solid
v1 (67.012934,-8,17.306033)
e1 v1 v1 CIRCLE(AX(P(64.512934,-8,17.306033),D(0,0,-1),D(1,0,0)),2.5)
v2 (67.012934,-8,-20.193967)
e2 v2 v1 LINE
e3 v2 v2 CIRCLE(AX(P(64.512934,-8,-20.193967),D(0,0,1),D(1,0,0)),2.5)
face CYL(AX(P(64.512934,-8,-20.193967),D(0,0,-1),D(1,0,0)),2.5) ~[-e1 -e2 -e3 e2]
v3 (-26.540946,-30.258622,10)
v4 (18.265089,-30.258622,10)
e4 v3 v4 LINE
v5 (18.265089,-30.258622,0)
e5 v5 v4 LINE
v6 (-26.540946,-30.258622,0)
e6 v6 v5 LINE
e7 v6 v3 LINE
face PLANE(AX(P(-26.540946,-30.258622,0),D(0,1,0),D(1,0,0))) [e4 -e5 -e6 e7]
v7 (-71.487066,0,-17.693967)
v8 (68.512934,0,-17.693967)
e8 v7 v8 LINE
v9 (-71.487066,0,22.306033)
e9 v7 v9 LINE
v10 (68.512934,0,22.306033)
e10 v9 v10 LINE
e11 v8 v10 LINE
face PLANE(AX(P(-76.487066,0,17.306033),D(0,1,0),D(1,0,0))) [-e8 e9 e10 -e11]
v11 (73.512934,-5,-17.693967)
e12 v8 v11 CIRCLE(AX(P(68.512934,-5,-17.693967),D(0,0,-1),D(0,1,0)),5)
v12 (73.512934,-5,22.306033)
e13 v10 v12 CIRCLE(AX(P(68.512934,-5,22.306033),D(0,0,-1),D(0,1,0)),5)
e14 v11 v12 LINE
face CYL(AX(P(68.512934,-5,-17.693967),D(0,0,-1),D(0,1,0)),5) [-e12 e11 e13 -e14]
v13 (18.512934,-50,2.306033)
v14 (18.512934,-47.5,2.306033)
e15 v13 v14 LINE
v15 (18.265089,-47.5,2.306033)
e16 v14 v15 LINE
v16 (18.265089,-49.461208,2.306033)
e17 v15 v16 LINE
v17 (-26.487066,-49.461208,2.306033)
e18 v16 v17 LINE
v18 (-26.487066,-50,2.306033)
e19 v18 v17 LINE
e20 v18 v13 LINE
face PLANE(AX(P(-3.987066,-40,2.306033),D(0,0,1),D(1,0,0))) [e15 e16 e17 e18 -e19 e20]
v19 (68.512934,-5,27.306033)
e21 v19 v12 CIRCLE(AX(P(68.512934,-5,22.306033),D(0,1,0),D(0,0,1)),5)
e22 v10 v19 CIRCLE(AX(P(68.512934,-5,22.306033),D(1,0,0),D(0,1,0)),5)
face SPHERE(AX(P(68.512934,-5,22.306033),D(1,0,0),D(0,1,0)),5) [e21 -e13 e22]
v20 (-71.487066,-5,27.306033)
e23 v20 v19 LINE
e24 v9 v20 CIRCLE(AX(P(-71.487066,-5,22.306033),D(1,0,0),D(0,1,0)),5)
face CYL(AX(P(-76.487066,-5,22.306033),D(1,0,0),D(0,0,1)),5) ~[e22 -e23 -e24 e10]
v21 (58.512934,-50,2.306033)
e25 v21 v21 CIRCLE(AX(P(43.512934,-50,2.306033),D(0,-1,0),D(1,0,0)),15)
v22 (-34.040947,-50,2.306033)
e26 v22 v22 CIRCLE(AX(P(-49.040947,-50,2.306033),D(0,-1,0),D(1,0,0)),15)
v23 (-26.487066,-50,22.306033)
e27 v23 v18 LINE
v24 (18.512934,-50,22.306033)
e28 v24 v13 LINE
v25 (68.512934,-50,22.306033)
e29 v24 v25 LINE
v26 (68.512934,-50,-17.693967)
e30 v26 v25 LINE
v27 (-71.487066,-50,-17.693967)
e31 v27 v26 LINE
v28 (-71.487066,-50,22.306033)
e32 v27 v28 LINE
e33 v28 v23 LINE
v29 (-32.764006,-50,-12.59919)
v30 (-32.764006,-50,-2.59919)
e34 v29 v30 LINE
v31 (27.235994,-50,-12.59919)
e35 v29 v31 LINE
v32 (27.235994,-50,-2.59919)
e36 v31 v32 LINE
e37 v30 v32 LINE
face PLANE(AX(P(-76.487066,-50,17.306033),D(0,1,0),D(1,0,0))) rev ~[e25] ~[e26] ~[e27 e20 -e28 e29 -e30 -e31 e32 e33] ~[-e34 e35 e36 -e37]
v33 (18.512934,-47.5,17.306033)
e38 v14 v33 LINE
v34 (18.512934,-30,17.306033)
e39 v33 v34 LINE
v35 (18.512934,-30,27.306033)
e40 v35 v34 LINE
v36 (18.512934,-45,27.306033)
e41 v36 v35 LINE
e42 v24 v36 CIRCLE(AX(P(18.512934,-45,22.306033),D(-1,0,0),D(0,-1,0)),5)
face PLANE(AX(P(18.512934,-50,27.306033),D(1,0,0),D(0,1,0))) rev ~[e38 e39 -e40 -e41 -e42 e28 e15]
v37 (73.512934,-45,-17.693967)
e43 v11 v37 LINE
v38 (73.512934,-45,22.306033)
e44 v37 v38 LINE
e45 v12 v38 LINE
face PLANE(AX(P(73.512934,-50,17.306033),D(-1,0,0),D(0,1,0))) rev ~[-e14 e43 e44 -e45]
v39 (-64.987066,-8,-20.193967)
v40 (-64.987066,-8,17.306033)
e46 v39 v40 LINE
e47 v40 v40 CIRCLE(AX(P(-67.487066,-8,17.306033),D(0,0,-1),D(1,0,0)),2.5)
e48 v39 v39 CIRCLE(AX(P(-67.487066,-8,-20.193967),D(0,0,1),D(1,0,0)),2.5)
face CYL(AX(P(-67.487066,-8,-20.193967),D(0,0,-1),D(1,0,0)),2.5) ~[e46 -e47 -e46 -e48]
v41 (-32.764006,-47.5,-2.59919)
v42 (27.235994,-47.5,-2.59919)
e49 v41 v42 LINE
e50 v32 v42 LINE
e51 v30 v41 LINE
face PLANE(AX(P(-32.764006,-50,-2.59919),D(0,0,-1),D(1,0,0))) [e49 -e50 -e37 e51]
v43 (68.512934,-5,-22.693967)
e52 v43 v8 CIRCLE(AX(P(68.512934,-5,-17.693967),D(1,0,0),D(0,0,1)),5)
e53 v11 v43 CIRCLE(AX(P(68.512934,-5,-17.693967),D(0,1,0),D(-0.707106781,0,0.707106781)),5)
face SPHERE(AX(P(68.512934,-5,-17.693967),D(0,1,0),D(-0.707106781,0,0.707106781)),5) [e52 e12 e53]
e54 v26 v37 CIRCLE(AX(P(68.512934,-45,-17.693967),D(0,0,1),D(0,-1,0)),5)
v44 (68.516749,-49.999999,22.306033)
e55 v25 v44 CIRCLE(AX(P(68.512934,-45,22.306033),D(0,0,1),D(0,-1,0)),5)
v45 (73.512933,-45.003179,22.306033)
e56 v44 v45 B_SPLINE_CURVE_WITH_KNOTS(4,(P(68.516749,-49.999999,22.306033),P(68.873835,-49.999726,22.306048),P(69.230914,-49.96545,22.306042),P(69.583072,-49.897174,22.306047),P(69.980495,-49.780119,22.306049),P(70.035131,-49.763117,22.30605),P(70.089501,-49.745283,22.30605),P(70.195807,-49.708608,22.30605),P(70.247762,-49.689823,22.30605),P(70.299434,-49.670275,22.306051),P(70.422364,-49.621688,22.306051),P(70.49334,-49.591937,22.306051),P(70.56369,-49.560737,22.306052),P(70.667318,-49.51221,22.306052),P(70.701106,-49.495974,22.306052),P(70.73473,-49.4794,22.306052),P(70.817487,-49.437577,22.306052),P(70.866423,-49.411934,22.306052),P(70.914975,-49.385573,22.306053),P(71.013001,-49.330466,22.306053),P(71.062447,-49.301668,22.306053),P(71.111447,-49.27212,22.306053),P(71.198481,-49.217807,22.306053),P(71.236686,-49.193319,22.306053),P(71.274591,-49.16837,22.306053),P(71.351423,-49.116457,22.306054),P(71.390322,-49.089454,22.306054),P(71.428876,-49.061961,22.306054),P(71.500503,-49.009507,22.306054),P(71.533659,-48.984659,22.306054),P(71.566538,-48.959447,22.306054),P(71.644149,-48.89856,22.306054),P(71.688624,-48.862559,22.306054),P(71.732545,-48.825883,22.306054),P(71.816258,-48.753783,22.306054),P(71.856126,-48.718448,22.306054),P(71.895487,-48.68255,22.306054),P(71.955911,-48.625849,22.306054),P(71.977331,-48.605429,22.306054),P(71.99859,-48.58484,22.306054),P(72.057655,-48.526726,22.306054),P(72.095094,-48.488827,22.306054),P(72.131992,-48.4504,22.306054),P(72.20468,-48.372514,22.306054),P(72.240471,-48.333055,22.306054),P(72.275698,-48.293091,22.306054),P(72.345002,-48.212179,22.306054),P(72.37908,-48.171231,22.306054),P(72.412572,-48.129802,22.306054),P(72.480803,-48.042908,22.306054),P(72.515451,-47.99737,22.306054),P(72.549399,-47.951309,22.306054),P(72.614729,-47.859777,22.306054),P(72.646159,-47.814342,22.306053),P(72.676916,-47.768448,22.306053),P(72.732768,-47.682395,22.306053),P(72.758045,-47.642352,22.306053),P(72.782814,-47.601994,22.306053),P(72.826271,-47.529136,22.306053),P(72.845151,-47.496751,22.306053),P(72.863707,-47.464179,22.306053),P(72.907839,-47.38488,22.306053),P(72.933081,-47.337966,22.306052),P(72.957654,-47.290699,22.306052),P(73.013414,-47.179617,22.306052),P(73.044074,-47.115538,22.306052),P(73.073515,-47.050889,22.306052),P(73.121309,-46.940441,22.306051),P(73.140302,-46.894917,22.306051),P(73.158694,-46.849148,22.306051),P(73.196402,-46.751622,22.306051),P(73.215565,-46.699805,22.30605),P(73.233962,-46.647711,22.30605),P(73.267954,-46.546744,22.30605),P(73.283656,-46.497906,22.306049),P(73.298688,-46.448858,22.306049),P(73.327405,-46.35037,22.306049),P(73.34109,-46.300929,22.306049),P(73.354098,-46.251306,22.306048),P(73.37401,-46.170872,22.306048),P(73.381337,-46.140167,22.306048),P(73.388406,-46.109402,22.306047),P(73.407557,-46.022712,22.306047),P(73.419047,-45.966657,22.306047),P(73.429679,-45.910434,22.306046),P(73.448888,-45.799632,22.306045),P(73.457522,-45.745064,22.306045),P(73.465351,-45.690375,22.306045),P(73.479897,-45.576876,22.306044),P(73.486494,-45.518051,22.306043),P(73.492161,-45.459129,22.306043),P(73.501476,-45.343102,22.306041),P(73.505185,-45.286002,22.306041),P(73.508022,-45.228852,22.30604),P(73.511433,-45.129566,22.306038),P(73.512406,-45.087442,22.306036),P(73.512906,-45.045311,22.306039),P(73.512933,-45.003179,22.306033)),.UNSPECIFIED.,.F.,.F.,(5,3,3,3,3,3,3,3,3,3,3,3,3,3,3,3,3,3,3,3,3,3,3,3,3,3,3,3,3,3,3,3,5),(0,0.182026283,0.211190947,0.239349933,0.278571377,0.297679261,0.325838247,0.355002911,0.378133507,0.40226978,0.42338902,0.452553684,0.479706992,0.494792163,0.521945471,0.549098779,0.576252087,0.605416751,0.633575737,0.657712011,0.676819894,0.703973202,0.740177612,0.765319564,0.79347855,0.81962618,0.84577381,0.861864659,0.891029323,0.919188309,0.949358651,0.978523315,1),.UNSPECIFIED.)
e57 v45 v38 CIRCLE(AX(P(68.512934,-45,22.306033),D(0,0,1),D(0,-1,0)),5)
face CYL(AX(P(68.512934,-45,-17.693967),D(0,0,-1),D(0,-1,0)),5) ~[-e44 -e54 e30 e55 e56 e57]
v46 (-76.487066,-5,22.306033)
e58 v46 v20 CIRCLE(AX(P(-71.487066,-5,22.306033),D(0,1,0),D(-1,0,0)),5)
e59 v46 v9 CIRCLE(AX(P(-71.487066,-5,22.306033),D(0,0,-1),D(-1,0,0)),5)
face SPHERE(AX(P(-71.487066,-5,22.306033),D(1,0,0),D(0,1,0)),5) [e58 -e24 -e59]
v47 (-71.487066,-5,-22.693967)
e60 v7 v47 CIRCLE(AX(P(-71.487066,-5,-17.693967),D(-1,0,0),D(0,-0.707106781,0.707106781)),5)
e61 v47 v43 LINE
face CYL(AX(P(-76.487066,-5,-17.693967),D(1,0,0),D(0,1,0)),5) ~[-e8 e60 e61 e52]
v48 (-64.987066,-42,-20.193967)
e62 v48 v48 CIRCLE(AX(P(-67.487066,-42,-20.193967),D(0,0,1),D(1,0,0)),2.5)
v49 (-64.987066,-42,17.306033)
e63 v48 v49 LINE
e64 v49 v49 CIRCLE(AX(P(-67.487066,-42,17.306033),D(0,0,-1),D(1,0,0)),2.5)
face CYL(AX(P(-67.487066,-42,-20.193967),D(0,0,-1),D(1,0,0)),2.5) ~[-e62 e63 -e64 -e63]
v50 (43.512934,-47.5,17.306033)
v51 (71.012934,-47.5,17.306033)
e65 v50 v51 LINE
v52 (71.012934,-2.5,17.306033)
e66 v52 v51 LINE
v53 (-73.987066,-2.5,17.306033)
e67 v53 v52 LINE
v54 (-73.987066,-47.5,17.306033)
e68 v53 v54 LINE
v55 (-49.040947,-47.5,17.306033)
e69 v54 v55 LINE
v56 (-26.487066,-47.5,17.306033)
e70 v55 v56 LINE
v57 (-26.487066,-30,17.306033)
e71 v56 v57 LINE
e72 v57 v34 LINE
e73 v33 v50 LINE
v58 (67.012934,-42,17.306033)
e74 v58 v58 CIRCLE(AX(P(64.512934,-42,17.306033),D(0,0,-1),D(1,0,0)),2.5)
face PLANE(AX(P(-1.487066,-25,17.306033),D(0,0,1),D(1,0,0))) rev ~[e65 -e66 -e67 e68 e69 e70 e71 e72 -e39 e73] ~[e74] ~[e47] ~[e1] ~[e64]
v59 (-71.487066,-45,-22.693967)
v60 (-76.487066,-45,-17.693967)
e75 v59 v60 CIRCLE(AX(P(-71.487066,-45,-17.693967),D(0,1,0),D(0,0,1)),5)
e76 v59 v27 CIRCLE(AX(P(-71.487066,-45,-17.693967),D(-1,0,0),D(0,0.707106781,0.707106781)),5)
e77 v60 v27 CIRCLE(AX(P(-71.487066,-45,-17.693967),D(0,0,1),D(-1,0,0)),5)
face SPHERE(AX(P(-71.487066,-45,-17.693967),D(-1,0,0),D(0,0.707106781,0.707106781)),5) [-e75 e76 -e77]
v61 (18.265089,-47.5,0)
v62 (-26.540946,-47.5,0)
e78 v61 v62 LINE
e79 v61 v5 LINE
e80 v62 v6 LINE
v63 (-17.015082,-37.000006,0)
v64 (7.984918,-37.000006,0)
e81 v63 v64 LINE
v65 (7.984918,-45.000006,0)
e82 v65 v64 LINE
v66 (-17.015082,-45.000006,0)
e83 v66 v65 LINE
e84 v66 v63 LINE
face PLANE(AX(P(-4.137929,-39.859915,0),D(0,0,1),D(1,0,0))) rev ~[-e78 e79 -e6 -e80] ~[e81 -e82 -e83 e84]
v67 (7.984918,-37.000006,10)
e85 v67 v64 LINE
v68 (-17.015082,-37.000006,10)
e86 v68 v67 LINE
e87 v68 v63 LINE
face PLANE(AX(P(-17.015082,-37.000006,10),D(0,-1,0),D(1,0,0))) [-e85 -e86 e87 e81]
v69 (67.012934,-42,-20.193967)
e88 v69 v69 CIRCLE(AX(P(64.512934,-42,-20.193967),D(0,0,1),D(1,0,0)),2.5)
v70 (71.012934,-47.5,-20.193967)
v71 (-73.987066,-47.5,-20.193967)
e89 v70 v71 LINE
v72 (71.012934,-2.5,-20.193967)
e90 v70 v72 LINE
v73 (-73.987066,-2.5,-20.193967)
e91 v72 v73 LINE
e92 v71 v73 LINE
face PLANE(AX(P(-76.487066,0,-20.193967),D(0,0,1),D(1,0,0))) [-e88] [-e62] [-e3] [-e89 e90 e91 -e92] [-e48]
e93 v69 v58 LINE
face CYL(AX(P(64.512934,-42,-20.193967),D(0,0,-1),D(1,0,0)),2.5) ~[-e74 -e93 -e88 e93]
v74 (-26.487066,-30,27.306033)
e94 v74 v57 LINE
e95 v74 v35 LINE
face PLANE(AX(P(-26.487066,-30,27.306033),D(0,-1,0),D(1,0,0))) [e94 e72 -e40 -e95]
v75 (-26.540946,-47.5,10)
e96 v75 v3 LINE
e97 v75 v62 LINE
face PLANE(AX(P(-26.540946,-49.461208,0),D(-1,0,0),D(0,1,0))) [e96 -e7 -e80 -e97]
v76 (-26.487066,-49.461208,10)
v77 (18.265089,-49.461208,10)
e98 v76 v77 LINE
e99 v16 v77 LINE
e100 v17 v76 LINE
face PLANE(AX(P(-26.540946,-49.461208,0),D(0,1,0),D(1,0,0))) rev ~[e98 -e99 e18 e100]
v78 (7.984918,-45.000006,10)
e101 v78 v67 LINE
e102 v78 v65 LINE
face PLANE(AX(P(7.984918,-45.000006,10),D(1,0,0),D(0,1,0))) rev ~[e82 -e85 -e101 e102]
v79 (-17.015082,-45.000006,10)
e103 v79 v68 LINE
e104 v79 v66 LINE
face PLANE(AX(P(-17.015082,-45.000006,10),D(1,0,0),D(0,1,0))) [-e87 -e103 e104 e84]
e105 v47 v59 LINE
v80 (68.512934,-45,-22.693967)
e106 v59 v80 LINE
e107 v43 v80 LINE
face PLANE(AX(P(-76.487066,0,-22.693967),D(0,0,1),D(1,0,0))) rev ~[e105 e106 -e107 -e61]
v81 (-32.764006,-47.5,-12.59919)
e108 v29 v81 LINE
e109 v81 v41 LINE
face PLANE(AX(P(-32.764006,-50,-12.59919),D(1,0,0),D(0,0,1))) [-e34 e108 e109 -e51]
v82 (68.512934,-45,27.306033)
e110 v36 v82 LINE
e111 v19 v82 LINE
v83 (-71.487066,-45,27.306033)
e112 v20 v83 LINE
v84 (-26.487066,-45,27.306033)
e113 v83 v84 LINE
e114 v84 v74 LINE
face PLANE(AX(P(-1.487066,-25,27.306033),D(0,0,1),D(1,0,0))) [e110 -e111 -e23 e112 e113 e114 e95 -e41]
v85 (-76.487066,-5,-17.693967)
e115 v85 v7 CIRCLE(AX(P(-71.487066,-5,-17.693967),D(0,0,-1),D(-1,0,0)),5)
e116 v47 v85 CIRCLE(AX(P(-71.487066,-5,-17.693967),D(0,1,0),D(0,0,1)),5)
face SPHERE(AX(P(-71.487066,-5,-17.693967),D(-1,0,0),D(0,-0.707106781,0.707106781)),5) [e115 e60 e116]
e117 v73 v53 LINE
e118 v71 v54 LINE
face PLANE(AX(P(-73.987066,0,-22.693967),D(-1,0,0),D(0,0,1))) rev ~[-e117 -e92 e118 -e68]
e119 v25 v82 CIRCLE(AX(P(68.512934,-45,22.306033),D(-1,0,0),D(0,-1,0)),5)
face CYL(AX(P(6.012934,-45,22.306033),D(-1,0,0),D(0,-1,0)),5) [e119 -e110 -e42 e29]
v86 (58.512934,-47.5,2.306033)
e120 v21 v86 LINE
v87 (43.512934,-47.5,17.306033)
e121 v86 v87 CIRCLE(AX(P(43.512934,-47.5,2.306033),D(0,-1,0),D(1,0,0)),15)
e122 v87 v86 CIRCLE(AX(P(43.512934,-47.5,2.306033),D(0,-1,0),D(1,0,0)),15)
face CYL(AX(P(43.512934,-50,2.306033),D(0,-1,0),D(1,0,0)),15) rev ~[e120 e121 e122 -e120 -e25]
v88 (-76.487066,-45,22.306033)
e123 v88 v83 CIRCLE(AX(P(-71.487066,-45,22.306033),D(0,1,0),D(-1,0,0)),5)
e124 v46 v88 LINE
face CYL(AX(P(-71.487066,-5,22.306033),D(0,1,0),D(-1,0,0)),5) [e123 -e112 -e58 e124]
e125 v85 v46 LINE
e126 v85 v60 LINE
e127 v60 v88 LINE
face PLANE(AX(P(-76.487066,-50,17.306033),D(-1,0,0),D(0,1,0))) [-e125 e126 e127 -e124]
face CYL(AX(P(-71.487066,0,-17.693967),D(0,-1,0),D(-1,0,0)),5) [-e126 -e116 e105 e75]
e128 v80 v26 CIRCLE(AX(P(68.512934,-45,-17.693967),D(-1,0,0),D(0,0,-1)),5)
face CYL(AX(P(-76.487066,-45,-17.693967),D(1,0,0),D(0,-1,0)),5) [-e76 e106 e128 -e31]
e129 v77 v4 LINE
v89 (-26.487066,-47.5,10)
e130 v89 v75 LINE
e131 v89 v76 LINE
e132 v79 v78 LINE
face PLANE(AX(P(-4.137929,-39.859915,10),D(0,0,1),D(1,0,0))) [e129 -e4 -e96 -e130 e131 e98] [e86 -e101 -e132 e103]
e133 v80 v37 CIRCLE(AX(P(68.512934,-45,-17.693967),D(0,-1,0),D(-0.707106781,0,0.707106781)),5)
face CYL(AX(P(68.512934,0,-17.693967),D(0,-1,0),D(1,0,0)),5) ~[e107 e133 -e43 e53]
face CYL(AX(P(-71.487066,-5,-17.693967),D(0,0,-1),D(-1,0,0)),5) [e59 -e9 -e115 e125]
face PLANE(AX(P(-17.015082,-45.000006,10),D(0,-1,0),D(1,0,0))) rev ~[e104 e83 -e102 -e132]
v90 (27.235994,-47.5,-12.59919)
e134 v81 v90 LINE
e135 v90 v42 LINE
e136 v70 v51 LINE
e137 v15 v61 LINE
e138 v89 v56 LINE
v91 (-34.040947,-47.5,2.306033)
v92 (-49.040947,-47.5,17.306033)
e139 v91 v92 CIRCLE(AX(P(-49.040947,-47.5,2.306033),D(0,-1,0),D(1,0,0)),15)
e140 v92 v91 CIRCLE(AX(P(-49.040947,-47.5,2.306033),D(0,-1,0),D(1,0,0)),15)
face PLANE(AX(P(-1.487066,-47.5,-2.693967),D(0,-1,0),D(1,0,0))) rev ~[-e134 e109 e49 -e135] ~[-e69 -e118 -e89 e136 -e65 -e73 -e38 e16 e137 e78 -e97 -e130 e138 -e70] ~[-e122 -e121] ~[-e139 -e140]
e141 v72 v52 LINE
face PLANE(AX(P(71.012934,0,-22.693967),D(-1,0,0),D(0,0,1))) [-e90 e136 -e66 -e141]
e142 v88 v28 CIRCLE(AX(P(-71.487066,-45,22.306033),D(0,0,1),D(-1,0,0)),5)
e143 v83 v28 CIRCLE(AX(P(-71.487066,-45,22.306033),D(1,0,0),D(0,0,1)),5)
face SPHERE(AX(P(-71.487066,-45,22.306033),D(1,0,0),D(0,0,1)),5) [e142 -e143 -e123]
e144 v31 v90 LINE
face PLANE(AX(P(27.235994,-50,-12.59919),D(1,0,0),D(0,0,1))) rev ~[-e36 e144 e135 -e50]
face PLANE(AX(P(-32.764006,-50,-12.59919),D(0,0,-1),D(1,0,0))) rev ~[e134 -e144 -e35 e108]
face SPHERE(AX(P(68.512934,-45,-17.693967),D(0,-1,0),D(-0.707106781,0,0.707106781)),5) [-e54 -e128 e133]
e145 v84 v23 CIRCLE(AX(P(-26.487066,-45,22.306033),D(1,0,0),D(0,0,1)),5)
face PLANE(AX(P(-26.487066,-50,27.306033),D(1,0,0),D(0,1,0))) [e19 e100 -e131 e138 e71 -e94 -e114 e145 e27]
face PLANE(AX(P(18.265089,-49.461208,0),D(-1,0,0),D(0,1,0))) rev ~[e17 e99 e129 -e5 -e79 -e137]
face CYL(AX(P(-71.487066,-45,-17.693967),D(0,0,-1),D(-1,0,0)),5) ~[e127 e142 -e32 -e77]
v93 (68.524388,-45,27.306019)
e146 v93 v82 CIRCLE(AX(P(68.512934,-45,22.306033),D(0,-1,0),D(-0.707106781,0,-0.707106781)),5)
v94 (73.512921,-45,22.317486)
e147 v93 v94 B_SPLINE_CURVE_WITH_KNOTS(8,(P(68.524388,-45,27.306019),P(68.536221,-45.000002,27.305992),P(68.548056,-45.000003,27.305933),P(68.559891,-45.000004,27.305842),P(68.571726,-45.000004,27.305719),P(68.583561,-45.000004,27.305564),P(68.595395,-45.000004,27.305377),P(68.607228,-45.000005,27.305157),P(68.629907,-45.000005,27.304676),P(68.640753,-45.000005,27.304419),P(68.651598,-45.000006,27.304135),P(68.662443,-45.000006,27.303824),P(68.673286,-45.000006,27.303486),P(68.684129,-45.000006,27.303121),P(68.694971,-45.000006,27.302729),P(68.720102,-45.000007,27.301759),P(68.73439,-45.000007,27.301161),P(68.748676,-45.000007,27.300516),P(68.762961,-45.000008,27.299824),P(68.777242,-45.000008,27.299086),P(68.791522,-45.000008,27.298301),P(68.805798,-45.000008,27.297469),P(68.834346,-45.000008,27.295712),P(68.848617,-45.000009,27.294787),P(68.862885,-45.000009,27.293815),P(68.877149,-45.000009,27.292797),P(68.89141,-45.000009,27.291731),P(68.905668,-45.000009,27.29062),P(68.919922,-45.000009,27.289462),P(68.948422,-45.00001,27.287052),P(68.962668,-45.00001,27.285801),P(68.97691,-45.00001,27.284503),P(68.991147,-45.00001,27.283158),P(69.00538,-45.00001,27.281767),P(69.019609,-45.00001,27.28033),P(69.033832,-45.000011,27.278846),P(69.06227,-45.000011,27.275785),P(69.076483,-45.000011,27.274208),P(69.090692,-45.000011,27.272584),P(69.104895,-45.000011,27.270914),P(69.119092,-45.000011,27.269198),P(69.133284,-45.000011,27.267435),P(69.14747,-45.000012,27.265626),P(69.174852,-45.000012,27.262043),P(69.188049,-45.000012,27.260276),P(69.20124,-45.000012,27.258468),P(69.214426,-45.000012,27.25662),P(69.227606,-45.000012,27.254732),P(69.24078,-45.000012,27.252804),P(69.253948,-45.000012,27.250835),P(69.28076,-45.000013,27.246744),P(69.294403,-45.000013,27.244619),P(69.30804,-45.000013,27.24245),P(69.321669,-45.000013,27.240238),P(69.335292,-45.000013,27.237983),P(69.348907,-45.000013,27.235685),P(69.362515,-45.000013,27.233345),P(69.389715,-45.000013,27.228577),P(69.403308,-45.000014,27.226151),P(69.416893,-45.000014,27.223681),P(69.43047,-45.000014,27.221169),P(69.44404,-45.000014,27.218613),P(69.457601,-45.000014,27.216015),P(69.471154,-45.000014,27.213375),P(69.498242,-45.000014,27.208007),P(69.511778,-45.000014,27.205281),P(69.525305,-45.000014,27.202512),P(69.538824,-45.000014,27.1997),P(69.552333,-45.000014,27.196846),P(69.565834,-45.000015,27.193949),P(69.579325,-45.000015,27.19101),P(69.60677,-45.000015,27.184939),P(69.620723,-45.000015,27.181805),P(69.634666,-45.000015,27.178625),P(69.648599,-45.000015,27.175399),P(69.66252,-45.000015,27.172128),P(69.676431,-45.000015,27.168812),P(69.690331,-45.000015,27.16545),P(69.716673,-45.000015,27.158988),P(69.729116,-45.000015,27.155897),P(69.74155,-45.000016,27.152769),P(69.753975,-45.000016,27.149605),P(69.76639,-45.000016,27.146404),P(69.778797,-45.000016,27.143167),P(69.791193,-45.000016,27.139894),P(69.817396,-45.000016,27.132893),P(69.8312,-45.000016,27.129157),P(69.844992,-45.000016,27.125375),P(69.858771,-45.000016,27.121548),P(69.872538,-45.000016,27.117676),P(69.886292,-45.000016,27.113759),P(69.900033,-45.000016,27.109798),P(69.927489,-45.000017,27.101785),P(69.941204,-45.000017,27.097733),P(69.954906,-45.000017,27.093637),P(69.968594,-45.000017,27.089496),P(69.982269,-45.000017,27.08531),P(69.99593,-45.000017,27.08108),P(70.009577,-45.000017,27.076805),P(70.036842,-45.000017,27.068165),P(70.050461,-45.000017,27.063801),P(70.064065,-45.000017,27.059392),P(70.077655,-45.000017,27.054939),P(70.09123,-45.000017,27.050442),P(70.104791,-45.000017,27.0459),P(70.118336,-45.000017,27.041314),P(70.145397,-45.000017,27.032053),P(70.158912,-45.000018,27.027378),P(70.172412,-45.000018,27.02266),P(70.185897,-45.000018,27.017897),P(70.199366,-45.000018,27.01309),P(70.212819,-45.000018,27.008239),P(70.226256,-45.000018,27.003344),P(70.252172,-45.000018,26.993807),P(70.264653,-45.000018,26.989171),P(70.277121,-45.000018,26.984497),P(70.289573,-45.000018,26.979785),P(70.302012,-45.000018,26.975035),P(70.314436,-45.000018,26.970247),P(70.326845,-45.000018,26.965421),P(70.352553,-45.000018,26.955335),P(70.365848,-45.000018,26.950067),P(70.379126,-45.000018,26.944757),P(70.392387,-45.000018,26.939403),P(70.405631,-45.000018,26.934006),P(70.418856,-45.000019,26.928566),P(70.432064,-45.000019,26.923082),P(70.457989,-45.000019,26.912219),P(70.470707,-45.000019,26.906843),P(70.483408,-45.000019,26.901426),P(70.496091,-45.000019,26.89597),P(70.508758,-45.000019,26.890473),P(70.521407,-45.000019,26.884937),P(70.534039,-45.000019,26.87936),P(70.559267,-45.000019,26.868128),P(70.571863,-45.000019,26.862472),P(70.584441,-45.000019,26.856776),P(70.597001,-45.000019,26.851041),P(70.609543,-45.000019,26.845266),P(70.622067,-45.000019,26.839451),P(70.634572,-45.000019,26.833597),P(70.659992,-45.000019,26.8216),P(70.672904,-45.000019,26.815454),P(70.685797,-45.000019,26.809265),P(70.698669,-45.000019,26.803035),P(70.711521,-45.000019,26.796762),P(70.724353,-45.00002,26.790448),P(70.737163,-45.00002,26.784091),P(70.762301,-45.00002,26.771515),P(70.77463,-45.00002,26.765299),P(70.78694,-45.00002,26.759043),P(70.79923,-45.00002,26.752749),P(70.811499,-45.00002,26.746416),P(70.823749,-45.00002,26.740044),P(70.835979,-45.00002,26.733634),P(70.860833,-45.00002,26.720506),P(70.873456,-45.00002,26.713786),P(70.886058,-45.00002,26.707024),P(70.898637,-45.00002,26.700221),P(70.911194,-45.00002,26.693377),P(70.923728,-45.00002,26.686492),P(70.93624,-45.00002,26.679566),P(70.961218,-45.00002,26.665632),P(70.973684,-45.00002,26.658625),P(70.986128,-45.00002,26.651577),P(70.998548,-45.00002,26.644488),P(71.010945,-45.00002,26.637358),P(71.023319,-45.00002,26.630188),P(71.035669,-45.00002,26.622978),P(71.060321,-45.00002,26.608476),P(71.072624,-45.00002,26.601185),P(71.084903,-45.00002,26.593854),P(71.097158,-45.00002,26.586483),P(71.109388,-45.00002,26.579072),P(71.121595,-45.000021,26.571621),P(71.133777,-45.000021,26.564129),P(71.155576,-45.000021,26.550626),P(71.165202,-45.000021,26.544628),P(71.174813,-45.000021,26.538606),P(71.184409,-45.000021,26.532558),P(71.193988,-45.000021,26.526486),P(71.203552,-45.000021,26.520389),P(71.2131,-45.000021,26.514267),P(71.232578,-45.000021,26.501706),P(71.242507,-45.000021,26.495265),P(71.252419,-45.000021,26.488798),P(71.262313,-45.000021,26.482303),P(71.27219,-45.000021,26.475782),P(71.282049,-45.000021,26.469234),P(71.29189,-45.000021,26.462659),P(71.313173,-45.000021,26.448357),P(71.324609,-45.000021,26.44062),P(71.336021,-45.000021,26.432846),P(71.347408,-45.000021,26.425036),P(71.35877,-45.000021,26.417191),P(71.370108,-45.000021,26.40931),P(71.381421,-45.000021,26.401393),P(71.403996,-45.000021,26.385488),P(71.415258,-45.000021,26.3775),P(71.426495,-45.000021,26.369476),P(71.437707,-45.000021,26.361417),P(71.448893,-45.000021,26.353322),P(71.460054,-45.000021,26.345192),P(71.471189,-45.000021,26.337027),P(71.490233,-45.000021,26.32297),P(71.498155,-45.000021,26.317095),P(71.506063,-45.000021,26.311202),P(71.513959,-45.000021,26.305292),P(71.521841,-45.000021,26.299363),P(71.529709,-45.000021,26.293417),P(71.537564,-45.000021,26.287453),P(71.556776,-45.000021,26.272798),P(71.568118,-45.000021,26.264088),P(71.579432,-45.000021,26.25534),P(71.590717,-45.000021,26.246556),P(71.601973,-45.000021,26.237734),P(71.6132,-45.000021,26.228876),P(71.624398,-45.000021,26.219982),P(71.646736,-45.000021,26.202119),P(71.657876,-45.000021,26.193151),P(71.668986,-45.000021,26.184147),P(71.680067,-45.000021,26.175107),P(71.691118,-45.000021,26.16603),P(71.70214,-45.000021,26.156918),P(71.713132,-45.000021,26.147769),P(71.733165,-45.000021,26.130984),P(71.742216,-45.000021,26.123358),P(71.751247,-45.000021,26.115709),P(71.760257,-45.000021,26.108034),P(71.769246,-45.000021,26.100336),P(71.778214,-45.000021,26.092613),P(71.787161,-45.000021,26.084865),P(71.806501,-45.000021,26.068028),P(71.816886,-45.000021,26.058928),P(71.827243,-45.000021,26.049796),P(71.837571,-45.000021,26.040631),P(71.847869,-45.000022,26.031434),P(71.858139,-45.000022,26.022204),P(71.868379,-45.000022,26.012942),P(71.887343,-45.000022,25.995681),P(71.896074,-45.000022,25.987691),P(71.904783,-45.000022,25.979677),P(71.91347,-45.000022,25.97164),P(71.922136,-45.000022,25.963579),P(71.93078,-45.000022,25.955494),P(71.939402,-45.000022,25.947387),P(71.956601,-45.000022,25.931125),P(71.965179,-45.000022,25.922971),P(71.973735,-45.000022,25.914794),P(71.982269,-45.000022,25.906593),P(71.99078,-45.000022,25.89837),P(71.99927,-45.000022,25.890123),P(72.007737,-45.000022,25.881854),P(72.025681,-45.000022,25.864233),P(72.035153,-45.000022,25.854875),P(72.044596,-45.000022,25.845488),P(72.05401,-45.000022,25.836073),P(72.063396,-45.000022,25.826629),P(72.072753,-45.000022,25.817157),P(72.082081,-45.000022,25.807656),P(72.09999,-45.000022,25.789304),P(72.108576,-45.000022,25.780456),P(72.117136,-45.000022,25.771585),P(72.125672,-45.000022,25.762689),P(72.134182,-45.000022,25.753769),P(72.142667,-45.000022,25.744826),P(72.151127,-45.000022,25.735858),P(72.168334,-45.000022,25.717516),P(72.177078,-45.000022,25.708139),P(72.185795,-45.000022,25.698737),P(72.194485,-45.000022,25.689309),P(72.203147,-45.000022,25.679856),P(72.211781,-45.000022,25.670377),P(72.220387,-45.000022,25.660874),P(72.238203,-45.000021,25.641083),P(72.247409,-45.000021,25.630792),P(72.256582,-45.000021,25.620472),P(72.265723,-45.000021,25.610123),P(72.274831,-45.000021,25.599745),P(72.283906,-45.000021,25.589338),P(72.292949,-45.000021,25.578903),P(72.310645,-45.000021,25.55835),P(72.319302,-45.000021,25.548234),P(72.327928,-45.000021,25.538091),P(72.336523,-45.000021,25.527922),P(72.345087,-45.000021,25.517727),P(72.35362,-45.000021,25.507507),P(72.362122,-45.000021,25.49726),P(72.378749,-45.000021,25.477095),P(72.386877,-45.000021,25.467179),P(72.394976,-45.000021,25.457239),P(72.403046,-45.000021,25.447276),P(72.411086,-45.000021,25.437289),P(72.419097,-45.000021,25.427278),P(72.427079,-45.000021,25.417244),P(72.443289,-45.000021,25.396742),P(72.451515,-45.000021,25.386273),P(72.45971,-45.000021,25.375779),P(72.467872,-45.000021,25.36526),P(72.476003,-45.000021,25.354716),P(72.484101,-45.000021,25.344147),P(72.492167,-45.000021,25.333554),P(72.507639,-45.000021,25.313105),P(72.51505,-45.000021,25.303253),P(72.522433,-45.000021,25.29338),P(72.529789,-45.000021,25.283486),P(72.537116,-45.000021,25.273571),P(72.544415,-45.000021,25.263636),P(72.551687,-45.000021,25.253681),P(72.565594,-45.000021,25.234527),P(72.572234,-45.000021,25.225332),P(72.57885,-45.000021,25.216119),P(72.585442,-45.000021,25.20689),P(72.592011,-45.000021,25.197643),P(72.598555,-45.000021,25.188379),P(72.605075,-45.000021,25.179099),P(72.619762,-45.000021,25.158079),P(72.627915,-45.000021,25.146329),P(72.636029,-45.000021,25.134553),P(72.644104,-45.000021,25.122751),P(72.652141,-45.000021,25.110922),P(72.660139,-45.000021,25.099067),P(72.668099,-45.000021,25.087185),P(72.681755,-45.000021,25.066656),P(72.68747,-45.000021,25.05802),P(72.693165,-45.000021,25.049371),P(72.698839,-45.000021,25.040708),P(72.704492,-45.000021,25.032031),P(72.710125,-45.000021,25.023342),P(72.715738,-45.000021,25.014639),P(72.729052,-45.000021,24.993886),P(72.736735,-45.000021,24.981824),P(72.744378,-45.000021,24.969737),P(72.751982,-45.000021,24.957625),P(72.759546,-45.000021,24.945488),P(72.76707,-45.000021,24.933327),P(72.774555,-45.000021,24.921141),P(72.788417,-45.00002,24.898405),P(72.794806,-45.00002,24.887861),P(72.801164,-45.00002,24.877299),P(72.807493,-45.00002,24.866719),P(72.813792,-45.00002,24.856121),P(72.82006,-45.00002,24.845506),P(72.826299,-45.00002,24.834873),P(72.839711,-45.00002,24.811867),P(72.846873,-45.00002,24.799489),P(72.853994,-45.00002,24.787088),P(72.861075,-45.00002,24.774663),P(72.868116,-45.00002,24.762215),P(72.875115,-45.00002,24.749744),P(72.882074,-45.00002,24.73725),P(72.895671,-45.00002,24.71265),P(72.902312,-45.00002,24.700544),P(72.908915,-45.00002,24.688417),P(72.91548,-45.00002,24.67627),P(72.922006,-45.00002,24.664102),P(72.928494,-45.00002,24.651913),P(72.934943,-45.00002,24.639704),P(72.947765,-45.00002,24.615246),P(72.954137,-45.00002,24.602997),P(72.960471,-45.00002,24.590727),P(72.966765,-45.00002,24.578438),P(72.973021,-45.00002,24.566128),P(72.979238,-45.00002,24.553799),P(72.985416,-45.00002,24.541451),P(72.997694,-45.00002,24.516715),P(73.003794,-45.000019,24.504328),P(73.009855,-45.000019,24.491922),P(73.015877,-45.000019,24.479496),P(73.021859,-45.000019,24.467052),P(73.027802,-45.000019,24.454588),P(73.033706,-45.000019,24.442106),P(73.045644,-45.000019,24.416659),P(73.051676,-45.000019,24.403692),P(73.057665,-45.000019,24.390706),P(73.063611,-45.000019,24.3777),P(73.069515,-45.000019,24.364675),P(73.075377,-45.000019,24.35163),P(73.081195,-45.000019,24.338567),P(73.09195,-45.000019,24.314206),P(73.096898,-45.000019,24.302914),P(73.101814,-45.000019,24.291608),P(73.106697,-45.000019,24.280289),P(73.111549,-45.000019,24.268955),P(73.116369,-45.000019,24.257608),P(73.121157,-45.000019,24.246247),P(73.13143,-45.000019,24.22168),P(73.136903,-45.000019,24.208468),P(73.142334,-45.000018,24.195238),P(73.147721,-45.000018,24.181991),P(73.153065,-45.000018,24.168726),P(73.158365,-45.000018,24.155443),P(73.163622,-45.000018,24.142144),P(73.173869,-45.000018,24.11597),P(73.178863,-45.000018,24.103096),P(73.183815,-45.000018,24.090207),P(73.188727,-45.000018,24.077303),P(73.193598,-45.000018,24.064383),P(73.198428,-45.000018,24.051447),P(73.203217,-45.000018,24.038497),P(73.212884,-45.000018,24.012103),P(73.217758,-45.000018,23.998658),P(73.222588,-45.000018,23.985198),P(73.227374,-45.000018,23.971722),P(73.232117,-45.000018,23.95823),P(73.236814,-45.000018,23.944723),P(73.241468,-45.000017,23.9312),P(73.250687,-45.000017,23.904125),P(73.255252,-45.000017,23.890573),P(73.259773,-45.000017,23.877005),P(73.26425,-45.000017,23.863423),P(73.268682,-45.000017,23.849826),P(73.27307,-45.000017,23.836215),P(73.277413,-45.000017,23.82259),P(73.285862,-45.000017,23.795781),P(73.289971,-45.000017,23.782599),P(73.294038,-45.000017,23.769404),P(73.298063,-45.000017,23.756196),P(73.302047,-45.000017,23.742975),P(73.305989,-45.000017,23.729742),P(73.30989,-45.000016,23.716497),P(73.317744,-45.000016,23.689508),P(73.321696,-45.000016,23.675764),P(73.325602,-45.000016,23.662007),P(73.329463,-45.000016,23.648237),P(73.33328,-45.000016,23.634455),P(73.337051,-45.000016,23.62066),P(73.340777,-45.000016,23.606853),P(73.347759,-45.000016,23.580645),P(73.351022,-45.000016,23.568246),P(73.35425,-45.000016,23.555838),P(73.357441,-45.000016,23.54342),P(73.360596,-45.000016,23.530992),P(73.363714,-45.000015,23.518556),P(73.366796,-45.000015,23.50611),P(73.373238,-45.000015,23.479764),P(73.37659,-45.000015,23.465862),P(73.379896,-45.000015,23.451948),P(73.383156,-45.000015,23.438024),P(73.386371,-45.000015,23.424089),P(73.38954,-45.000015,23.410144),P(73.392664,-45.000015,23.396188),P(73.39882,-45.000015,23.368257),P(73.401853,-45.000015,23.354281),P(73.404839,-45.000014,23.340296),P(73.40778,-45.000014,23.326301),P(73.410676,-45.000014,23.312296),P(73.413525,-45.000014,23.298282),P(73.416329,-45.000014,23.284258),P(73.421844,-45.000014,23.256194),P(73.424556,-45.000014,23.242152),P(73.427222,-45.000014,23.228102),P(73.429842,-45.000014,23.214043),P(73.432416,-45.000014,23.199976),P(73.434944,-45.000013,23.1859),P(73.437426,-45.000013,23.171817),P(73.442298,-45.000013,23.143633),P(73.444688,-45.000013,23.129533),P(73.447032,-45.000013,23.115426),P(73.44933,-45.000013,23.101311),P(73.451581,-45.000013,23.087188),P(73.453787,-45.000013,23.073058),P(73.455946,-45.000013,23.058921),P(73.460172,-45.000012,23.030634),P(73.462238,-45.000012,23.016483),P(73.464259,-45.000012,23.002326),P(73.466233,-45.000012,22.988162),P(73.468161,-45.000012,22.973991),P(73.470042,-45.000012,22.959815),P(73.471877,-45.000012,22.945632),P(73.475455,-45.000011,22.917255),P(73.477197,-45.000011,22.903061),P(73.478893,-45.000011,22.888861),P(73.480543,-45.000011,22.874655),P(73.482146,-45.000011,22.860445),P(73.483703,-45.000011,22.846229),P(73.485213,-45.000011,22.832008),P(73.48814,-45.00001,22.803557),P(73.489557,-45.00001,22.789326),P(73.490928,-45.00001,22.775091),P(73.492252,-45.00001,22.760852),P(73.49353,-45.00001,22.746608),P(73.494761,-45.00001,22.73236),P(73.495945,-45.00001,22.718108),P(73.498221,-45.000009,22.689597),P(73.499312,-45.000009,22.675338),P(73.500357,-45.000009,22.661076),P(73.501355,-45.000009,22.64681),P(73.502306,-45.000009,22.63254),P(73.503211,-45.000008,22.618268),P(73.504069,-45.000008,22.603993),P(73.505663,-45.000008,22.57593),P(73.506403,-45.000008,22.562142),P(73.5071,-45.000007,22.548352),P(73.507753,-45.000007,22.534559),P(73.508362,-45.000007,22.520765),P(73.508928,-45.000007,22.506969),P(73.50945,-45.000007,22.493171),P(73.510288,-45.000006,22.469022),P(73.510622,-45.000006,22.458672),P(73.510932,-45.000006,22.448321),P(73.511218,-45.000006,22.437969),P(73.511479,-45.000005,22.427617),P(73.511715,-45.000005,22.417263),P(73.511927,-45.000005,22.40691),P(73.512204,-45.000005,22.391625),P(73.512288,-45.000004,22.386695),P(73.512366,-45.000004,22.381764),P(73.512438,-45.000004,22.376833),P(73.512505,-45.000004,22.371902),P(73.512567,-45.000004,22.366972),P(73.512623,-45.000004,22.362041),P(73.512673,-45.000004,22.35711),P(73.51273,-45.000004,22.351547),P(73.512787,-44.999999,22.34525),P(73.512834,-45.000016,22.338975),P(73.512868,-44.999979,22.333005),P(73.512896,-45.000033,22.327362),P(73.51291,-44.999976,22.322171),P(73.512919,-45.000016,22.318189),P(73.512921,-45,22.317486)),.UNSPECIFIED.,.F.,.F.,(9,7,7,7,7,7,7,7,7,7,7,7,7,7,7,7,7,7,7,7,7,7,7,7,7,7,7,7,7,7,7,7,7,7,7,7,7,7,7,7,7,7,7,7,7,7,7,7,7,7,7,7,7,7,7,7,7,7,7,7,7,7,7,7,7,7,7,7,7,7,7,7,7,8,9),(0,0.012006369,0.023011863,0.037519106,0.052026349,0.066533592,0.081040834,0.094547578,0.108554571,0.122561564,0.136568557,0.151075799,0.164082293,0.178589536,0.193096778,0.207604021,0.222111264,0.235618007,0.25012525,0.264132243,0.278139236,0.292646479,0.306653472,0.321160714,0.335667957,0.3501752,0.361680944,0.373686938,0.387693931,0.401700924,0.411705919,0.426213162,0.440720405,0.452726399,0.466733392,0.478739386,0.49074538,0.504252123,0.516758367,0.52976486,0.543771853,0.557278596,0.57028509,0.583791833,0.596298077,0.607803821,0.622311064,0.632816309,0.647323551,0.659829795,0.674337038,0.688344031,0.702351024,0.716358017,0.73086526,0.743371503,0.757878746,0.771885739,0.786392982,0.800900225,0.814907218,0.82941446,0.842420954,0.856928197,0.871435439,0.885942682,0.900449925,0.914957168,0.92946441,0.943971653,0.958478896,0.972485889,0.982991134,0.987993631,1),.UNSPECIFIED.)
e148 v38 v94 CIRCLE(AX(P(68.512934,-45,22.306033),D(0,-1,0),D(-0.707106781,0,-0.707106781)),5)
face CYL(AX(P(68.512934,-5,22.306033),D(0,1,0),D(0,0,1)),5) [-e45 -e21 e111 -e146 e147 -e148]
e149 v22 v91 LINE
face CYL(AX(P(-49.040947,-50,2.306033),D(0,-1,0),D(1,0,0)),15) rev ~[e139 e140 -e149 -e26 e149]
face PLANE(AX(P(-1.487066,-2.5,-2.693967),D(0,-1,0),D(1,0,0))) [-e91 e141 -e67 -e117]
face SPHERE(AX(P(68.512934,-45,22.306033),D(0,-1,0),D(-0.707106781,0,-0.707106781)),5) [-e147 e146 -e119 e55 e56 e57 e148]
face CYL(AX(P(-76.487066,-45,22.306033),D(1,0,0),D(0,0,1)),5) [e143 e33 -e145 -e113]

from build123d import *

# Parameters (mm, degrees)
F0_W          = 150
F0_H          = 40
F1_DEPTH      = 50
F2_T          = -2.5
F5_R          = 2.5
F7_DEPTH      = 40
F6_R          = 2.5
F8_DEPTH      = 40
F4_R          = 2.5
F9_DEPTH      = 40
F3_R          = 2.5
F10_DEPTH     = 40
F11_W         = 150
F11_H         = 50
F12_DEPTH     = 10
F13_W         = 45
F13_H         = 20
F14_DEPTH     = 25
F15_W         = 44.8060352355
F15_H         = 19.2025862634
F16_DEPTH     = 10
F17_W         = 25
F17_H         = 8
F18_DEPTH     = 25
F19_R         = 15
F20_DEPTH     = 5
F21_R         = 5
F22_T1_DEPTH  = 57.5
F22_T3_DEPTH  = 40
F22_T5_DEPTH  = 57.5
F22_T7_DEPTH  = 40
F22_S11_W     = 5
F22_S11_H     = 5
F22_T12_DEPTH = 5
F22_S17_W     = 5
F22_S17_H     = 5
F22_T18_DEPTH = 5
F22_S23_W     = 5
F22_S23_H     = 5
F22_T24_DEPTH = 5
F22_S29_W     = 5
F22_S29_H     = 5
F22_T30_DEPTH = 5
F22_T34_ANGLE = 90
F22_T36_ANGLE = 90
F22_T38_ANGLE = 90
F23_T1_DEPTH  = 62.5
F23_S5_W      = 5
F23_S5_H      = 5
F23_T6_DEPTH  = 5
F24_W         = 60
F24_H         = 10
F25_DEPTH     = 25


# Not quite as in the source:
# - a fillet or chamfer that OpenCascade refuses, or shapes differently, is made with other operations: its cross-section is extruded or revolved along the edge and cut away or added


with BuildPart() as f1:
    # F0 (on Front) → F1 (new body)
    with BuildSketch(Plane.XZ):
        with Locations((-1.4870658517, -2.6939674467)):
            Rectangle(F0_W, F0_H)
    extrude(amount=F1_DEPTH)

    # F2
    f2_openings = [f1.faces().sort_by_distance(p)[0] for p in [
        (-1.487066, -25, 17.306033),
    ]]
    offset(amount=F2_T, openings=f2_openings)

    # F5 (on face) → F7 (join)
    with BuildSketch(Plane.XY.offset(-20.1939674467)):
        with Locations((64.5129341483, -42)):
            Circle(F5_R)
    extrude(amount=F7_DEPTH)

    # F6 (on face) → F8 (join)
    with BuildSketch(Plane.XY.offset(-20.1939674467)):
        with Locations((-67.4870658517, -42)):
            Circle(F6_R)
    extrude(amount=F8_DEPTH)

    # F4 (on face) → F9 (join)
    with BuildSketch(Plane.XY.offset(-20.1939674467)):
        with Locations((64.5129341483, -8)):
            Circle(F4_R)
    extrude(amount=F9_DEPTH)

    # F3 (on face) → F10 (join)
    with BuildSketch(Plane.XY.offset(-20.1939674467)):
        with Locations((-67.4870658517, -8)):
            Circle(F3_R)
    extrude(amount=F10_DEPTH)

    # F11 (on face) → F12 (join)
    with BuildSketch(Plane.XY.offset(17.3060325533)):
        with Locations((-1.4870658517, -25)):
            Rectangle(F11_W, F11_H)
    extrude(amount=F12_DEPTH)

    # F13 (on face) → F14 (cut)
    with BuildSketch(Plane.XY.offset(27.3060325533)):
        with Locations((-3.9870658517, -40)):
            Rectangle(F13_W, F13_H)
    extrude(amount=-F14_DEPTH, mode=Mode.SUBTRACT)

    # F15 (on Top) → F16 (join)
    with BuildSketch(Plane.XY):
        with Locations((-4.1379285976, -39.8599151522)):
            Rectangle(F15_W, F15_H)
    extrude(amount=F16_DEPTH)

    # F17 (on face) → F18 (cut)
    with BuildSketch(Plane.XY.offset(10)):
        with Locations((-4.5150823891, -41.0000055134)):
            Rectangle(F17_W, F17_H)
    extrude(amount=-F18_DEPTH, mode=Mode.SUBTRACT)

    # F19 (on face) → F20 (cut)
    with BuildSketch(Plane.XZ.offset(50)):
        with Locations((-49.0409471095, 2.3060325533)):
            Circle(F19_R)
        with Locations((43.5129341483, 2.3060325533)):
            Circle(F19_R)
    extrude(amount=-F20_DEPTH, mode=Mode.SUBTRACT)

    # F21
    f21_edges = [f1.edges().sort_by_distance(p)[0] for p in [
        (-1.487066, -50, -22.693967),
        (73.512934, -25, -22.693967),
        (-76.487066, -25, -22.693967),
        (-1.487066, 0, -22.693967),
        (-1.487066, 0, 27.306033),
        (-51.487066, -50, 27.306033),
    ]]
    fillet(f21_edges, radius=F21_R)

    # F22: fillet of radius 5 on 3 edges, made by hand

    # F22_s2 → F22_t1 (cut)
    with BuildSketch(Plane.XZ.offset(5)):
        with BuildLine():
            ThreePointArc((68.5129341483, 27.3060325533), (72.0484680542, 25.8415664592), (73.5129341483, 22.3060325533))
            Line((73.5129341483, 22.3060325533), (73.5129341483, 27.3060325533))
            Line((73.5129341483, 27.3060325533), (68.5129341483, 27.3060325533))
        make_face()
    extrude(amount=F22_T1_DEPTH, mode=Mode.SUBTRACT)

    # F22_s4 → F22_t3 (cut)
    with BuildSketch(Plane.XZ.offset(5)):
        with BuildLine():
            ThreePointArc((-76.4870658517, 22.3060325533), (-75.0225997576, 25.8415664592), (-71.4870658517, 27.3060325533))
            Line((-71.4870658517, 27.3060325533), (-76.4870658517, 27.3060325533))
            Line((-76.4870658517, 27.3060325533), (-76.4870658517, 22.3060325533))
        make_face()
    extrude(amount=F22_T3_DEPTH, mode=Mode.SUBTRACT)

    # F22_s6 → F22_t5 (cut)
    with BuildSketch(Plane.XY.offset(-17.6939674467)):
        with BuildLine():
            ThreePointArc((68.5129341483, -50), (72.0484680542, -48.5355339059), (73.5129341483, -45))
            Line((73.5129341483, -45), (73.5129341483, -50))
            Line((73.5129341483, -50), (68.5129341483, -50))
        make_face()
    extrude(amount=F22_T5_DEPTH, mode=Mode.SUBTRACT)

    # F22_s8 → F22_t7 (cut)
    with BuildSketch(Plane.XY.offset(-17.6939674467)):
        with BuildLine():
            ThreePointArc((-76.4870658517, -45), (-75.0225997576, -48.5355339059), (-71.4870658517, -50))
            Line((-71.4870658517, -50), (-76.4870658517, -50))
            Line((-76.4870658517, -50), (-76.4870658517, -45))
        make_face()
        with BuildLine():
            ThreePointArc((-76.4870658517, -5), (-75.0225997576, -1.4644660941), (-71.4870658517, 0))
            Line((-71.4870658517, 0), (-76.4870658517, 0))
            Line((-76.4870658517, 0), (-76.4870658517, -5))
        make_face()
        with BuildLine():
            ThreePointArc((68.5129341483, 0), (72.0484680542, -1.4644660941), (73.5129341483, -5))
            Line((73.5129341483, -5), (73.5129341483, 0))
            Line((73.5129341483, 0), (68.5129341483, 0))
        make_face()
    extrude(amount=F22_T7_DEPTH, mode=Mode.SUBTRACT)


with BuildPart() as f22_tool10:
    # F22_s11 → F22_t12 (new body)
    with BuildSketch(Plane.XZ.offset(45)):
        with Locations((71.0129341483, -20.1939674467)):
            Rectangle(F22_S11_W, F22_S11_H)
    extrude(amount=F22_T12_DEPTH)

    # F22_s13 → F22_t14 (revolve, cut)
    with BuildSketch(Plane(origin=(68.5129341483, -45, -17.6939674467), x_dir=(-0.7071067812, 0, 0.7071067812), z_dir=(0.7071067812, 0, 0.7071067812))):
        with BuildLine():
            ThreePointArc((0, -5), (5, 0), (0, 5))
            Line((0, 5), (0, -5))
        make_face()
    revolve(axis=Axis((68.5129341483, -45, -17.6939674467), (0, -1, 0)), mode=Mode.SUBTRACT)


with BuildPart() as f1_1:
    add(f1.part)

    # F22_t9: cut F22_tool10
    add(f22_tool10.part, mode=Mode.SUBTRACT)


with BuildPart() as f22_tool16:
    # F22_s17 → F22_t18 (new body)
    with BuildSketch(Plane.YZ.offset(-71.4870658517)):
        with Locations((-47.5, -20.1939674467)):
            Rectangle(F22_S17_W, F22_S17_H)
    extrude(amount=-F22_T18_DEPTH)

    # F22_s19 → F22_t20 (revolve, cut)
    with BuildSketch(Plane(origin=(-71.4870658517, -45, -17.6939674467), x_dir=(0, 0.7071067812, 0.7071067812), z_dir=(0, -0.7071067812, 0.7071067812))):
        with BuildLine():
            ThreePointArc((0, -5), (5, 0), (0, 5))
            Line((0, 5), (0, -5))
        make_face()
    revolve(axis=Axis((-71.4870658517, -45, -17.6939674467), (-1, 0, 0)), mode=Mode.SUBTRACT)


with BuildPart() as f1_2:
    add(f1_1.part)

    # F22_t15: cut F22_tool16
    add(f22_tool16.part, mode=Mode.SUBTRACT)


with BuildPart() as f22_tool22:
    # F22_s23 → F22_t24 (new body)
    with BuildSketch(Plane.YZ.offset(-71.4870658517)):
        with Locations((-2.5, -20.1939674467)):
            Rectangle(F22_S23_W, F22_S23_H)
    extrude(amount=-F22_T24_DEPTH)

    # F22_s25 → F22_t26 (revolve, cut)
    with BuildSketch(Plane(origin=(-71.4870658517, -5, -17.6939674467), x_dir=(0, -0.7071067812, 0.7071067812), z_dir=(0, -0.7071067812, -0.7071067812))):
        with BuildLine():
            ThreePointArc((0, -5), (5, 0), (0, 5))
            Line((0, 5), (0, -5))
        make_face()
    revolve(axis=Axis((-71.4870658517, -5, -17.6939674467), (-1, 0, 0)), mode=Mode.SUBTRACT)


with BuildPart() as f1_3:
    add(f1_2.part)

    # F22_t21: cut F22_tool22
    add(f22_tool22.part, mode=Mode.SUBTRACT)


with BuildPart() as f22_tool28:
    # F22_s29 → F22_t30 (new body)
    with BuildSketch(Plane.XZ.offset(5)):
        with Locations((71.0129341483, -20.1939674467)):
            Rectangle(F22_S29_W, F22_S29_H)
    extrude(amount=-F22_T30_DEPTH)

    # F22_s31 → F22_t32 (revolve, cut)
    with BuildSketch(Plane(origin=(68.5129341483, -5, -17.6939674467), x_dir=(-0.7071067812, 0, 0.7071067812), z_dir=(-0.7071067812, 0, -0.7071067812))):
        with BuildLine():
            ThreePointArc((0, -5), (5, 0), (0, 5))
            Line((0, 5), (0, -5))
        make_face()
    revolve(axis=Axis((68.5129341483, -5, -17.6939674467), (0, 1, 0)), mode=Mode.SUBTRACT)


with BuildPart() as f1_4:
    add(f1_3.part)

    # F22_t27: cut F22_tool28
    add(f22_tool28.part, mode=Mode.SUBTRACT)

    # F22_s33 → F22_t34 (revolve, cut)
    with BuildSketch(Plane.XY.offset(22.3060325533)):
        with BuildLine():
            ThreePointArc((-76.4870658517, -5), (-75.0225997576, -1.4644660941), (-71.4870658517, 0))
            Line((-71.4870658517, 0), (-76.4870658517, 0))
            Line((-76.4870658517, 0), (-76.4870658517, -5))
        make_face()
    revolve(axis=Axis((-76.4870658517, -5, 22.3060325533), (1, 0, 0)), revolution_arc=F22_T34_ANGLE, mode=Mode.SUBTRACT)

    # F22_s35 → F22_t36 (revolve, cut)
    with BuildSketch(Plane.XZ.offset(45)):
        with BuildLine():
            ThreePointArc((-76.4870658517, 22.3060325533), (-75.0225997576, 25.8415664592), (-71.4870658517, 27.3060325533))
            Line((-71.4870658517, 27.3060325533), (-76.4870658517, 27.3060325533))
            Line((-76.4870658517, 27.3060325533), (-76.4870658517, 22.3060325533))
        make_face()
    revolve(axis=Axis((-76.4870658517, -45, 22.3060325533), (1, 0, 0)), revolution_arc=F22_T36_ANGLE, mode=Mode.SUBTRACT)

    # F22_s37 → F22_t38 (revolve, cut)
    with BuildSketch(Plane.XY.offset(22.3060325533)):
        with BuildLine():
            ThreePointArc((68.5129341483, 0), (72.0484680542, -1.4644660941), (73.5129341483, -5))
            Line((73.5129341483, -5), (73.5129341483, 0))
            Line((73.5129341483, 0), (68.5129341483, 0))
        make_face()
    revolve(axis=Axis((73.5129341483, -5, 22.3060325533), (1, 0, 0)), revolution_arc=F22_T38_ANGLE, mode=Mode.SUBTRACT)

    # F23: fillet of radius 5 on 1 edges, made by hand

    # F23_s2 → F23_t1 (cut)
    with BuildSketch(Plane.YZ.offset(6.0129341483)):
        with BuildLine():
            ThreePointArc((-50, 22.3060325533), (-48.5355339059, 25.8415664592), (-45, 27.3060325533))
            Line((-45, 27.3060325533), (-50, 27.3060325533))
            Line((-50, 27.3060325533), (-50, 22.3060325533))
        make_face()
    extrude(amount=F23_T1_DEPTH, mode=Mode.SUBTRACT)


with BuildPart() as f23_tool4:
    # F23_s5 → F23_t6 (new body)
    with BuildSketch(Plane.XZ.offset(45)):
        with Locations((71.0129341483, 24.8060325533)):
            Rectangle(F23_S5_W, F23_S5_H)
    extrude(amount=F23_T6_DEPTH)

    # F23_s7 → F23_t8 (revolve, cut)
    with BuildSketch(Plane(origin=(68.5129341483, -45, 22.3060325533), x_dir=(-0.7071067812, 0, -0.7071067812), z_dir=(-0.7071067812, 0, 0.7071067812))):
        with BuildLine():
            ThreePointArc((0, -5), (5, 0), (0, 5))
            Line((0, 5), (0, -5))
        make_face()
    revolve(axis=Axis((68.5129341483, -45, 22.3060325533), (0, -1, 0)), mode=Mode.SUBTRACT)


with BuildPart() as f1_5:
    add(f1_4.part)

    # F23_t3: cut F23_tool4
    add(f23_tool4.part, mode=Mode.SUBTRACT)

    # F24 (on face) → F25 (cut)
    with BuildSketch(Plane.XZ.offset(50)):
        with Locations((-2.7640064806, -7.5991895379)):
            Rectangle(F24_W, F24_H)
    extrude(amount=-F25_DEPTH, mode=Mode.SUBTRACT)


solid = f1_5.part
